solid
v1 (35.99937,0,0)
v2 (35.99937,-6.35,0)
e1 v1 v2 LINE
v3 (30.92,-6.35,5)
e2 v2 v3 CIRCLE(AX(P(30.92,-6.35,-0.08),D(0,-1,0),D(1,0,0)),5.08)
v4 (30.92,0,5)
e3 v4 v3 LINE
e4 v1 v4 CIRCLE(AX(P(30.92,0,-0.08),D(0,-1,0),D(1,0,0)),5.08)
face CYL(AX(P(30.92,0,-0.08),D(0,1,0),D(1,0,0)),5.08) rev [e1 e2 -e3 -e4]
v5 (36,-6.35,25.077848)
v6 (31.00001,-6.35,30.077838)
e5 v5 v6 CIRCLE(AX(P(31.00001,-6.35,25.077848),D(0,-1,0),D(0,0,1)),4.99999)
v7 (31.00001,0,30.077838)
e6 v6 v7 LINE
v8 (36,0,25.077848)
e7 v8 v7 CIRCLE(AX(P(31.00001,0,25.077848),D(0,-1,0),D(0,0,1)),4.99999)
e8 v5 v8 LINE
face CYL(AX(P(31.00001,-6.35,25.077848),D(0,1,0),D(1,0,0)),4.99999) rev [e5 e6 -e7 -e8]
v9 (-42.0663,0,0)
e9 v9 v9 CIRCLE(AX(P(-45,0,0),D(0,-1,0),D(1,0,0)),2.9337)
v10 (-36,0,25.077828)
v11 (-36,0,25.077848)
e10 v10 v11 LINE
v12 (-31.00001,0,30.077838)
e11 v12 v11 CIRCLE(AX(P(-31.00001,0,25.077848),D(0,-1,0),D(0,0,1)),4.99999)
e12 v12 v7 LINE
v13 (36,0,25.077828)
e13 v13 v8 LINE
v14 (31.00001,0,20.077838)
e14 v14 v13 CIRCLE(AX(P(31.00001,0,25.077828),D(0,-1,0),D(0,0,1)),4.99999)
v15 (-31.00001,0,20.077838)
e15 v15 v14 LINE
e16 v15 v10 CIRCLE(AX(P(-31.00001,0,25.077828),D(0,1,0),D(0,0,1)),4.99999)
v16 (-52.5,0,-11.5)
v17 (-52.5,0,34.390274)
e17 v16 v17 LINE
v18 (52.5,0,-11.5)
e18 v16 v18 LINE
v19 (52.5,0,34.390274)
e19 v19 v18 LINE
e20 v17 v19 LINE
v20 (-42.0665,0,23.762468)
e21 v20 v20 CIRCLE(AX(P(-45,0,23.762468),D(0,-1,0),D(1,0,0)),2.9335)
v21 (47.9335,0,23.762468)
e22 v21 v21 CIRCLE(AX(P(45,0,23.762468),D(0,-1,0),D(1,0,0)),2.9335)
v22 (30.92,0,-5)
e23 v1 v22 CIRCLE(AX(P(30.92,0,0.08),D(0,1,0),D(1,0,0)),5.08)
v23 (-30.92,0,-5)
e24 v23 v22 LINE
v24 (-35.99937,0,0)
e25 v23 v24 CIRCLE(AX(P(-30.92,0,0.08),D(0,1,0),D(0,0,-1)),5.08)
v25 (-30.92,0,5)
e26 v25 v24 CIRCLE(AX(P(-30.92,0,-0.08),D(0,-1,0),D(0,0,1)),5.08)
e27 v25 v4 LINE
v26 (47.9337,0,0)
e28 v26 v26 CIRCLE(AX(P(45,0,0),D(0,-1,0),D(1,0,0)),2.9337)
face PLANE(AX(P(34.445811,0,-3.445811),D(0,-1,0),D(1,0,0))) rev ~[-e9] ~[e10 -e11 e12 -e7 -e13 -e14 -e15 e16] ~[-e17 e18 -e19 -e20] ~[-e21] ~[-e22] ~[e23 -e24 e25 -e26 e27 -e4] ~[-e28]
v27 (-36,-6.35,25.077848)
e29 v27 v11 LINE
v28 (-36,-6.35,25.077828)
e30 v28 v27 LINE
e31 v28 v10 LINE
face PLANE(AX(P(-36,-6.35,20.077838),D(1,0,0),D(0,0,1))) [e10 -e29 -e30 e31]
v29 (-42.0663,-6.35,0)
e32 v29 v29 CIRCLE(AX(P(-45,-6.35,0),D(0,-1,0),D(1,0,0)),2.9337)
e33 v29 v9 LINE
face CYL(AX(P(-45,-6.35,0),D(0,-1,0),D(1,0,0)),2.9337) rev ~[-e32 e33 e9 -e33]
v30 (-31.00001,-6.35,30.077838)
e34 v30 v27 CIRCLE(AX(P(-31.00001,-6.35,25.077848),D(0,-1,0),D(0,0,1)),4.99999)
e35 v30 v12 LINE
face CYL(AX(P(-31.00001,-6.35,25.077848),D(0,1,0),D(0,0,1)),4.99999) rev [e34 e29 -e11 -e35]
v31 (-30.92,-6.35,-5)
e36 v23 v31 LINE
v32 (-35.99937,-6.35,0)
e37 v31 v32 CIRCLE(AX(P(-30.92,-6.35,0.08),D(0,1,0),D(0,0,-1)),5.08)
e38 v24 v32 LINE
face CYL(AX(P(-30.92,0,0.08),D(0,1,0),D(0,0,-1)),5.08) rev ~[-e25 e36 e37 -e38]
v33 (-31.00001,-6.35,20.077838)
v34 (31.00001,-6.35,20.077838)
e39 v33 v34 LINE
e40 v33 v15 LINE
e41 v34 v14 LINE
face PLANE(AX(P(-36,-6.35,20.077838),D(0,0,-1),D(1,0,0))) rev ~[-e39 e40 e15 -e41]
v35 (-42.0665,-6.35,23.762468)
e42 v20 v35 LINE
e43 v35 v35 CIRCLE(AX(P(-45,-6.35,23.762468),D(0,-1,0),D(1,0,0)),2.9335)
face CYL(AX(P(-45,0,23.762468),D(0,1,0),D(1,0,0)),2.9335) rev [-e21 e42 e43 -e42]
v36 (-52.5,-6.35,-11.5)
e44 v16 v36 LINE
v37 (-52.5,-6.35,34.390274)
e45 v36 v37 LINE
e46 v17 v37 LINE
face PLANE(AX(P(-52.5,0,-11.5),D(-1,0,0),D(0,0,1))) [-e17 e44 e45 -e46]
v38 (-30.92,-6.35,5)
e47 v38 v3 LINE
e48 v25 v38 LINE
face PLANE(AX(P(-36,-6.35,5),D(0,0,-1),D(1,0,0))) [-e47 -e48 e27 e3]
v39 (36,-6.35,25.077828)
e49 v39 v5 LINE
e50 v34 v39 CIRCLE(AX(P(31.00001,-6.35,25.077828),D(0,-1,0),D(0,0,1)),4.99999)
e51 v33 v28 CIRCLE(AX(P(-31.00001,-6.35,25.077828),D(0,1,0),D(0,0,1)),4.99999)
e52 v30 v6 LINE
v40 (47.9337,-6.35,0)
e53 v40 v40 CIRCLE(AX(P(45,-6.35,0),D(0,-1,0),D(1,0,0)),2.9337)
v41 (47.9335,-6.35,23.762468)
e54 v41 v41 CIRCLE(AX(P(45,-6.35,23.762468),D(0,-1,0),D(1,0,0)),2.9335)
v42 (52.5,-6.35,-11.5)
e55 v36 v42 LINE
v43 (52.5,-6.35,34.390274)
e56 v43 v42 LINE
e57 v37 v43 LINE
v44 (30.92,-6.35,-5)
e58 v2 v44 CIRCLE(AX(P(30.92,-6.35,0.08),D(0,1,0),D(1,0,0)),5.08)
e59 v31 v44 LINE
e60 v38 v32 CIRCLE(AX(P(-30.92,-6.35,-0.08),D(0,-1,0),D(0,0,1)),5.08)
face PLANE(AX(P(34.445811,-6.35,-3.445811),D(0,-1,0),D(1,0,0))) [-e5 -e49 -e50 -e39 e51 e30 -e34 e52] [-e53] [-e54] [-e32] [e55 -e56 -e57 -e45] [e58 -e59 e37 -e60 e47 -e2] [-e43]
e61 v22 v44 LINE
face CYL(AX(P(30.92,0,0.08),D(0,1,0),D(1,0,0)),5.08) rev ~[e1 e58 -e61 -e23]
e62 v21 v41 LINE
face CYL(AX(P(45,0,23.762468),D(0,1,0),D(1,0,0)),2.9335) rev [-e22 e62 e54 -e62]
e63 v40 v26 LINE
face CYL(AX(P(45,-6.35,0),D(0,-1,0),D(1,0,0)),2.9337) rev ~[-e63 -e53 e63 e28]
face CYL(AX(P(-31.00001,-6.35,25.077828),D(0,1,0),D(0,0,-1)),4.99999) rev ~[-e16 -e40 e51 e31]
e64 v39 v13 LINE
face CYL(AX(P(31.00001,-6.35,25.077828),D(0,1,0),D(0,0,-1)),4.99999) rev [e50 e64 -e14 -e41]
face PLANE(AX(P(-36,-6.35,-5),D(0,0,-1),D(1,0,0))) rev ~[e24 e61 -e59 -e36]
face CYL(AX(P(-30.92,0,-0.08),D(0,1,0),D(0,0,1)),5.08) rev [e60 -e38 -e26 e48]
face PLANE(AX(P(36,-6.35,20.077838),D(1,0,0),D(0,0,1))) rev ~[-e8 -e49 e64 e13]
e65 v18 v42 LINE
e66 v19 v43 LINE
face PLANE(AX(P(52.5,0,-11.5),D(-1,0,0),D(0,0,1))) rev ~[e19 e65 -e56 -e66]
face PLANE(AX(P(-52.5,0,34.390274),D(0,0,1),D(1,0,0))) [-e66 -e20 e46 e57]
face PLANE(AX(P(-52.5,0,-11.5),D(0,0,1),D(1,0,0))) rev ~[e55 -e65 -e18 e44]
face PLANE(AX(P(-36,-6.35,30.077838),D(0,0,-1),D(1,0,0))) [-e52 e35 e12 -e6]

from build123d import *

# Parameters (mm, degrees)
F0_W        = 105
F0_H        = 23
F1_DEPTH    = 6.35
F2_W        = 72
F2_H        = 10
F3_DEPTH    = 25.4
F4_R        = 2.9337
F5_DEPTH    = 25.4
F6_T1_DEPTH = 6.35
F7_W        = 105
F7_H        = 23
F7_R        = 2.9335
F8_DEPTH    = 6.35
F9_W        = 72
F9_H        = 10
F10_DEPTH   = 25
F11_R       = 4.99999


# Not quite as in the source:
# - a fillet or chamfer that OpenCascade refuses, or shapes differently, is made with other operations: its cross-section is extruded or revolved along the edge and cut away or added
# - a fillet or chamfer is up to 0.001 mm smaller than in the source, because OpenCascade refuses the exact size


with BuildPart() as f1:
    # F0 (on Front) → F1 (new body)
    with BuildSketch(Plane.XZ):
        Rectangle(F0_W, F0_H)
    extrude(amount=F1_DEPTH)

    # F2 (on face) → F3 (cut)
    with BuildSketch(Plane.XZ.offset(6.35)):
        Rectangle(F2_W, F2_H)
    extrude(amount=-F3_DEPTH, mode=Mode.SUBTRACT)

    # F4 (on face) → F5 (cut)
    with BuildSketch(Plane.XZ.offset(6.35)):
        with Locations((-45, 0)):
            Circle(F4_R)
        with Locations((45, 0)):
            Circle(F4_R)
    extrude(amount=-F5_DEPTH, mode=Mode.SUBTRACT)

    # F6: fillet of radius 5.08 on 4 edges, made by hand

    # F6_s2 → F6_t1 (join)
    with BuildSketch(Plane.XZ):
        with BuildLine():
            ThreePointArc((36, 0.08), (34.5121024484, -3.5121024484), (30.92, -5))
            Line((30.92, -5), (36, -5))
            Line((36, -5), (36, 0.08))
        make_face()
        with BuildLine():
            ThreePointArc((-30.92, 5), (-34.5121024484, 3.5121024484), (-36, -0.08))
            Line((-36, -0.08), (-36, 5))
            Line((-36, 5), (-30.92, 5))
        make_face()
        with BuildLine():
            ThreePointArc((-30.92, -5), (-34.5121024484, -3.5121024484), (-36, 0.08))
            Line((-36, 0.08), (-36, -5))
            Line((-36, -5), (-30.92, -5))
        make_face()
        with BuildLine():
            ThreePointArc((36, -0.08), (34.5121024484, 3.5121024484), (30.92, 5))
            Line((30.92, 5), (36, 5))
            Line((36, 5), (36, -0.08))
        make_face()
    extrude(amount=F6_T1_DEPTH)

    # F7 (on Front) → F8 (join)
    with BuildSketch(Plane.XZ):
        with Locations((0, 22.8902743906)):
            Rectangle(F7_W, F7_H)
        with Locations((-45, 23.7624682486)):
            Circle(F7_R, mode=Mode.SUBTRACT)
        with Locations((45, 23.7624682486)):
            Circle(F7_R, mode=Mode.SUBTRACT)
    extrude(amount=F8_DEPTH)

    # F9 (on face) → F10 (cut)
    with BuildSketch(Plane.XZ.offset(6.35)):
        with Locations((0, 25.0778379703)):
            Rectangle(F9_W, F9_H)
    extrude(amount=-F10_DEPTH, mode=Mode.SUBTRACT)

    # F11 (radius 5 in the source; OpenCascade refuses exactly that, so slightly less here)
    f11_edges = [f1.edges().sort_by_distance(p)[0] for p in [
        (-36, -3.175, 20.077838),
        (36, -3.175, 20.077838),
        (36, -3.175, 30.077838),
        (-36, -3.175, 30.077838),
    ]]
    fillet(f11_edges, radius=F11_R)


solid = f1.part
